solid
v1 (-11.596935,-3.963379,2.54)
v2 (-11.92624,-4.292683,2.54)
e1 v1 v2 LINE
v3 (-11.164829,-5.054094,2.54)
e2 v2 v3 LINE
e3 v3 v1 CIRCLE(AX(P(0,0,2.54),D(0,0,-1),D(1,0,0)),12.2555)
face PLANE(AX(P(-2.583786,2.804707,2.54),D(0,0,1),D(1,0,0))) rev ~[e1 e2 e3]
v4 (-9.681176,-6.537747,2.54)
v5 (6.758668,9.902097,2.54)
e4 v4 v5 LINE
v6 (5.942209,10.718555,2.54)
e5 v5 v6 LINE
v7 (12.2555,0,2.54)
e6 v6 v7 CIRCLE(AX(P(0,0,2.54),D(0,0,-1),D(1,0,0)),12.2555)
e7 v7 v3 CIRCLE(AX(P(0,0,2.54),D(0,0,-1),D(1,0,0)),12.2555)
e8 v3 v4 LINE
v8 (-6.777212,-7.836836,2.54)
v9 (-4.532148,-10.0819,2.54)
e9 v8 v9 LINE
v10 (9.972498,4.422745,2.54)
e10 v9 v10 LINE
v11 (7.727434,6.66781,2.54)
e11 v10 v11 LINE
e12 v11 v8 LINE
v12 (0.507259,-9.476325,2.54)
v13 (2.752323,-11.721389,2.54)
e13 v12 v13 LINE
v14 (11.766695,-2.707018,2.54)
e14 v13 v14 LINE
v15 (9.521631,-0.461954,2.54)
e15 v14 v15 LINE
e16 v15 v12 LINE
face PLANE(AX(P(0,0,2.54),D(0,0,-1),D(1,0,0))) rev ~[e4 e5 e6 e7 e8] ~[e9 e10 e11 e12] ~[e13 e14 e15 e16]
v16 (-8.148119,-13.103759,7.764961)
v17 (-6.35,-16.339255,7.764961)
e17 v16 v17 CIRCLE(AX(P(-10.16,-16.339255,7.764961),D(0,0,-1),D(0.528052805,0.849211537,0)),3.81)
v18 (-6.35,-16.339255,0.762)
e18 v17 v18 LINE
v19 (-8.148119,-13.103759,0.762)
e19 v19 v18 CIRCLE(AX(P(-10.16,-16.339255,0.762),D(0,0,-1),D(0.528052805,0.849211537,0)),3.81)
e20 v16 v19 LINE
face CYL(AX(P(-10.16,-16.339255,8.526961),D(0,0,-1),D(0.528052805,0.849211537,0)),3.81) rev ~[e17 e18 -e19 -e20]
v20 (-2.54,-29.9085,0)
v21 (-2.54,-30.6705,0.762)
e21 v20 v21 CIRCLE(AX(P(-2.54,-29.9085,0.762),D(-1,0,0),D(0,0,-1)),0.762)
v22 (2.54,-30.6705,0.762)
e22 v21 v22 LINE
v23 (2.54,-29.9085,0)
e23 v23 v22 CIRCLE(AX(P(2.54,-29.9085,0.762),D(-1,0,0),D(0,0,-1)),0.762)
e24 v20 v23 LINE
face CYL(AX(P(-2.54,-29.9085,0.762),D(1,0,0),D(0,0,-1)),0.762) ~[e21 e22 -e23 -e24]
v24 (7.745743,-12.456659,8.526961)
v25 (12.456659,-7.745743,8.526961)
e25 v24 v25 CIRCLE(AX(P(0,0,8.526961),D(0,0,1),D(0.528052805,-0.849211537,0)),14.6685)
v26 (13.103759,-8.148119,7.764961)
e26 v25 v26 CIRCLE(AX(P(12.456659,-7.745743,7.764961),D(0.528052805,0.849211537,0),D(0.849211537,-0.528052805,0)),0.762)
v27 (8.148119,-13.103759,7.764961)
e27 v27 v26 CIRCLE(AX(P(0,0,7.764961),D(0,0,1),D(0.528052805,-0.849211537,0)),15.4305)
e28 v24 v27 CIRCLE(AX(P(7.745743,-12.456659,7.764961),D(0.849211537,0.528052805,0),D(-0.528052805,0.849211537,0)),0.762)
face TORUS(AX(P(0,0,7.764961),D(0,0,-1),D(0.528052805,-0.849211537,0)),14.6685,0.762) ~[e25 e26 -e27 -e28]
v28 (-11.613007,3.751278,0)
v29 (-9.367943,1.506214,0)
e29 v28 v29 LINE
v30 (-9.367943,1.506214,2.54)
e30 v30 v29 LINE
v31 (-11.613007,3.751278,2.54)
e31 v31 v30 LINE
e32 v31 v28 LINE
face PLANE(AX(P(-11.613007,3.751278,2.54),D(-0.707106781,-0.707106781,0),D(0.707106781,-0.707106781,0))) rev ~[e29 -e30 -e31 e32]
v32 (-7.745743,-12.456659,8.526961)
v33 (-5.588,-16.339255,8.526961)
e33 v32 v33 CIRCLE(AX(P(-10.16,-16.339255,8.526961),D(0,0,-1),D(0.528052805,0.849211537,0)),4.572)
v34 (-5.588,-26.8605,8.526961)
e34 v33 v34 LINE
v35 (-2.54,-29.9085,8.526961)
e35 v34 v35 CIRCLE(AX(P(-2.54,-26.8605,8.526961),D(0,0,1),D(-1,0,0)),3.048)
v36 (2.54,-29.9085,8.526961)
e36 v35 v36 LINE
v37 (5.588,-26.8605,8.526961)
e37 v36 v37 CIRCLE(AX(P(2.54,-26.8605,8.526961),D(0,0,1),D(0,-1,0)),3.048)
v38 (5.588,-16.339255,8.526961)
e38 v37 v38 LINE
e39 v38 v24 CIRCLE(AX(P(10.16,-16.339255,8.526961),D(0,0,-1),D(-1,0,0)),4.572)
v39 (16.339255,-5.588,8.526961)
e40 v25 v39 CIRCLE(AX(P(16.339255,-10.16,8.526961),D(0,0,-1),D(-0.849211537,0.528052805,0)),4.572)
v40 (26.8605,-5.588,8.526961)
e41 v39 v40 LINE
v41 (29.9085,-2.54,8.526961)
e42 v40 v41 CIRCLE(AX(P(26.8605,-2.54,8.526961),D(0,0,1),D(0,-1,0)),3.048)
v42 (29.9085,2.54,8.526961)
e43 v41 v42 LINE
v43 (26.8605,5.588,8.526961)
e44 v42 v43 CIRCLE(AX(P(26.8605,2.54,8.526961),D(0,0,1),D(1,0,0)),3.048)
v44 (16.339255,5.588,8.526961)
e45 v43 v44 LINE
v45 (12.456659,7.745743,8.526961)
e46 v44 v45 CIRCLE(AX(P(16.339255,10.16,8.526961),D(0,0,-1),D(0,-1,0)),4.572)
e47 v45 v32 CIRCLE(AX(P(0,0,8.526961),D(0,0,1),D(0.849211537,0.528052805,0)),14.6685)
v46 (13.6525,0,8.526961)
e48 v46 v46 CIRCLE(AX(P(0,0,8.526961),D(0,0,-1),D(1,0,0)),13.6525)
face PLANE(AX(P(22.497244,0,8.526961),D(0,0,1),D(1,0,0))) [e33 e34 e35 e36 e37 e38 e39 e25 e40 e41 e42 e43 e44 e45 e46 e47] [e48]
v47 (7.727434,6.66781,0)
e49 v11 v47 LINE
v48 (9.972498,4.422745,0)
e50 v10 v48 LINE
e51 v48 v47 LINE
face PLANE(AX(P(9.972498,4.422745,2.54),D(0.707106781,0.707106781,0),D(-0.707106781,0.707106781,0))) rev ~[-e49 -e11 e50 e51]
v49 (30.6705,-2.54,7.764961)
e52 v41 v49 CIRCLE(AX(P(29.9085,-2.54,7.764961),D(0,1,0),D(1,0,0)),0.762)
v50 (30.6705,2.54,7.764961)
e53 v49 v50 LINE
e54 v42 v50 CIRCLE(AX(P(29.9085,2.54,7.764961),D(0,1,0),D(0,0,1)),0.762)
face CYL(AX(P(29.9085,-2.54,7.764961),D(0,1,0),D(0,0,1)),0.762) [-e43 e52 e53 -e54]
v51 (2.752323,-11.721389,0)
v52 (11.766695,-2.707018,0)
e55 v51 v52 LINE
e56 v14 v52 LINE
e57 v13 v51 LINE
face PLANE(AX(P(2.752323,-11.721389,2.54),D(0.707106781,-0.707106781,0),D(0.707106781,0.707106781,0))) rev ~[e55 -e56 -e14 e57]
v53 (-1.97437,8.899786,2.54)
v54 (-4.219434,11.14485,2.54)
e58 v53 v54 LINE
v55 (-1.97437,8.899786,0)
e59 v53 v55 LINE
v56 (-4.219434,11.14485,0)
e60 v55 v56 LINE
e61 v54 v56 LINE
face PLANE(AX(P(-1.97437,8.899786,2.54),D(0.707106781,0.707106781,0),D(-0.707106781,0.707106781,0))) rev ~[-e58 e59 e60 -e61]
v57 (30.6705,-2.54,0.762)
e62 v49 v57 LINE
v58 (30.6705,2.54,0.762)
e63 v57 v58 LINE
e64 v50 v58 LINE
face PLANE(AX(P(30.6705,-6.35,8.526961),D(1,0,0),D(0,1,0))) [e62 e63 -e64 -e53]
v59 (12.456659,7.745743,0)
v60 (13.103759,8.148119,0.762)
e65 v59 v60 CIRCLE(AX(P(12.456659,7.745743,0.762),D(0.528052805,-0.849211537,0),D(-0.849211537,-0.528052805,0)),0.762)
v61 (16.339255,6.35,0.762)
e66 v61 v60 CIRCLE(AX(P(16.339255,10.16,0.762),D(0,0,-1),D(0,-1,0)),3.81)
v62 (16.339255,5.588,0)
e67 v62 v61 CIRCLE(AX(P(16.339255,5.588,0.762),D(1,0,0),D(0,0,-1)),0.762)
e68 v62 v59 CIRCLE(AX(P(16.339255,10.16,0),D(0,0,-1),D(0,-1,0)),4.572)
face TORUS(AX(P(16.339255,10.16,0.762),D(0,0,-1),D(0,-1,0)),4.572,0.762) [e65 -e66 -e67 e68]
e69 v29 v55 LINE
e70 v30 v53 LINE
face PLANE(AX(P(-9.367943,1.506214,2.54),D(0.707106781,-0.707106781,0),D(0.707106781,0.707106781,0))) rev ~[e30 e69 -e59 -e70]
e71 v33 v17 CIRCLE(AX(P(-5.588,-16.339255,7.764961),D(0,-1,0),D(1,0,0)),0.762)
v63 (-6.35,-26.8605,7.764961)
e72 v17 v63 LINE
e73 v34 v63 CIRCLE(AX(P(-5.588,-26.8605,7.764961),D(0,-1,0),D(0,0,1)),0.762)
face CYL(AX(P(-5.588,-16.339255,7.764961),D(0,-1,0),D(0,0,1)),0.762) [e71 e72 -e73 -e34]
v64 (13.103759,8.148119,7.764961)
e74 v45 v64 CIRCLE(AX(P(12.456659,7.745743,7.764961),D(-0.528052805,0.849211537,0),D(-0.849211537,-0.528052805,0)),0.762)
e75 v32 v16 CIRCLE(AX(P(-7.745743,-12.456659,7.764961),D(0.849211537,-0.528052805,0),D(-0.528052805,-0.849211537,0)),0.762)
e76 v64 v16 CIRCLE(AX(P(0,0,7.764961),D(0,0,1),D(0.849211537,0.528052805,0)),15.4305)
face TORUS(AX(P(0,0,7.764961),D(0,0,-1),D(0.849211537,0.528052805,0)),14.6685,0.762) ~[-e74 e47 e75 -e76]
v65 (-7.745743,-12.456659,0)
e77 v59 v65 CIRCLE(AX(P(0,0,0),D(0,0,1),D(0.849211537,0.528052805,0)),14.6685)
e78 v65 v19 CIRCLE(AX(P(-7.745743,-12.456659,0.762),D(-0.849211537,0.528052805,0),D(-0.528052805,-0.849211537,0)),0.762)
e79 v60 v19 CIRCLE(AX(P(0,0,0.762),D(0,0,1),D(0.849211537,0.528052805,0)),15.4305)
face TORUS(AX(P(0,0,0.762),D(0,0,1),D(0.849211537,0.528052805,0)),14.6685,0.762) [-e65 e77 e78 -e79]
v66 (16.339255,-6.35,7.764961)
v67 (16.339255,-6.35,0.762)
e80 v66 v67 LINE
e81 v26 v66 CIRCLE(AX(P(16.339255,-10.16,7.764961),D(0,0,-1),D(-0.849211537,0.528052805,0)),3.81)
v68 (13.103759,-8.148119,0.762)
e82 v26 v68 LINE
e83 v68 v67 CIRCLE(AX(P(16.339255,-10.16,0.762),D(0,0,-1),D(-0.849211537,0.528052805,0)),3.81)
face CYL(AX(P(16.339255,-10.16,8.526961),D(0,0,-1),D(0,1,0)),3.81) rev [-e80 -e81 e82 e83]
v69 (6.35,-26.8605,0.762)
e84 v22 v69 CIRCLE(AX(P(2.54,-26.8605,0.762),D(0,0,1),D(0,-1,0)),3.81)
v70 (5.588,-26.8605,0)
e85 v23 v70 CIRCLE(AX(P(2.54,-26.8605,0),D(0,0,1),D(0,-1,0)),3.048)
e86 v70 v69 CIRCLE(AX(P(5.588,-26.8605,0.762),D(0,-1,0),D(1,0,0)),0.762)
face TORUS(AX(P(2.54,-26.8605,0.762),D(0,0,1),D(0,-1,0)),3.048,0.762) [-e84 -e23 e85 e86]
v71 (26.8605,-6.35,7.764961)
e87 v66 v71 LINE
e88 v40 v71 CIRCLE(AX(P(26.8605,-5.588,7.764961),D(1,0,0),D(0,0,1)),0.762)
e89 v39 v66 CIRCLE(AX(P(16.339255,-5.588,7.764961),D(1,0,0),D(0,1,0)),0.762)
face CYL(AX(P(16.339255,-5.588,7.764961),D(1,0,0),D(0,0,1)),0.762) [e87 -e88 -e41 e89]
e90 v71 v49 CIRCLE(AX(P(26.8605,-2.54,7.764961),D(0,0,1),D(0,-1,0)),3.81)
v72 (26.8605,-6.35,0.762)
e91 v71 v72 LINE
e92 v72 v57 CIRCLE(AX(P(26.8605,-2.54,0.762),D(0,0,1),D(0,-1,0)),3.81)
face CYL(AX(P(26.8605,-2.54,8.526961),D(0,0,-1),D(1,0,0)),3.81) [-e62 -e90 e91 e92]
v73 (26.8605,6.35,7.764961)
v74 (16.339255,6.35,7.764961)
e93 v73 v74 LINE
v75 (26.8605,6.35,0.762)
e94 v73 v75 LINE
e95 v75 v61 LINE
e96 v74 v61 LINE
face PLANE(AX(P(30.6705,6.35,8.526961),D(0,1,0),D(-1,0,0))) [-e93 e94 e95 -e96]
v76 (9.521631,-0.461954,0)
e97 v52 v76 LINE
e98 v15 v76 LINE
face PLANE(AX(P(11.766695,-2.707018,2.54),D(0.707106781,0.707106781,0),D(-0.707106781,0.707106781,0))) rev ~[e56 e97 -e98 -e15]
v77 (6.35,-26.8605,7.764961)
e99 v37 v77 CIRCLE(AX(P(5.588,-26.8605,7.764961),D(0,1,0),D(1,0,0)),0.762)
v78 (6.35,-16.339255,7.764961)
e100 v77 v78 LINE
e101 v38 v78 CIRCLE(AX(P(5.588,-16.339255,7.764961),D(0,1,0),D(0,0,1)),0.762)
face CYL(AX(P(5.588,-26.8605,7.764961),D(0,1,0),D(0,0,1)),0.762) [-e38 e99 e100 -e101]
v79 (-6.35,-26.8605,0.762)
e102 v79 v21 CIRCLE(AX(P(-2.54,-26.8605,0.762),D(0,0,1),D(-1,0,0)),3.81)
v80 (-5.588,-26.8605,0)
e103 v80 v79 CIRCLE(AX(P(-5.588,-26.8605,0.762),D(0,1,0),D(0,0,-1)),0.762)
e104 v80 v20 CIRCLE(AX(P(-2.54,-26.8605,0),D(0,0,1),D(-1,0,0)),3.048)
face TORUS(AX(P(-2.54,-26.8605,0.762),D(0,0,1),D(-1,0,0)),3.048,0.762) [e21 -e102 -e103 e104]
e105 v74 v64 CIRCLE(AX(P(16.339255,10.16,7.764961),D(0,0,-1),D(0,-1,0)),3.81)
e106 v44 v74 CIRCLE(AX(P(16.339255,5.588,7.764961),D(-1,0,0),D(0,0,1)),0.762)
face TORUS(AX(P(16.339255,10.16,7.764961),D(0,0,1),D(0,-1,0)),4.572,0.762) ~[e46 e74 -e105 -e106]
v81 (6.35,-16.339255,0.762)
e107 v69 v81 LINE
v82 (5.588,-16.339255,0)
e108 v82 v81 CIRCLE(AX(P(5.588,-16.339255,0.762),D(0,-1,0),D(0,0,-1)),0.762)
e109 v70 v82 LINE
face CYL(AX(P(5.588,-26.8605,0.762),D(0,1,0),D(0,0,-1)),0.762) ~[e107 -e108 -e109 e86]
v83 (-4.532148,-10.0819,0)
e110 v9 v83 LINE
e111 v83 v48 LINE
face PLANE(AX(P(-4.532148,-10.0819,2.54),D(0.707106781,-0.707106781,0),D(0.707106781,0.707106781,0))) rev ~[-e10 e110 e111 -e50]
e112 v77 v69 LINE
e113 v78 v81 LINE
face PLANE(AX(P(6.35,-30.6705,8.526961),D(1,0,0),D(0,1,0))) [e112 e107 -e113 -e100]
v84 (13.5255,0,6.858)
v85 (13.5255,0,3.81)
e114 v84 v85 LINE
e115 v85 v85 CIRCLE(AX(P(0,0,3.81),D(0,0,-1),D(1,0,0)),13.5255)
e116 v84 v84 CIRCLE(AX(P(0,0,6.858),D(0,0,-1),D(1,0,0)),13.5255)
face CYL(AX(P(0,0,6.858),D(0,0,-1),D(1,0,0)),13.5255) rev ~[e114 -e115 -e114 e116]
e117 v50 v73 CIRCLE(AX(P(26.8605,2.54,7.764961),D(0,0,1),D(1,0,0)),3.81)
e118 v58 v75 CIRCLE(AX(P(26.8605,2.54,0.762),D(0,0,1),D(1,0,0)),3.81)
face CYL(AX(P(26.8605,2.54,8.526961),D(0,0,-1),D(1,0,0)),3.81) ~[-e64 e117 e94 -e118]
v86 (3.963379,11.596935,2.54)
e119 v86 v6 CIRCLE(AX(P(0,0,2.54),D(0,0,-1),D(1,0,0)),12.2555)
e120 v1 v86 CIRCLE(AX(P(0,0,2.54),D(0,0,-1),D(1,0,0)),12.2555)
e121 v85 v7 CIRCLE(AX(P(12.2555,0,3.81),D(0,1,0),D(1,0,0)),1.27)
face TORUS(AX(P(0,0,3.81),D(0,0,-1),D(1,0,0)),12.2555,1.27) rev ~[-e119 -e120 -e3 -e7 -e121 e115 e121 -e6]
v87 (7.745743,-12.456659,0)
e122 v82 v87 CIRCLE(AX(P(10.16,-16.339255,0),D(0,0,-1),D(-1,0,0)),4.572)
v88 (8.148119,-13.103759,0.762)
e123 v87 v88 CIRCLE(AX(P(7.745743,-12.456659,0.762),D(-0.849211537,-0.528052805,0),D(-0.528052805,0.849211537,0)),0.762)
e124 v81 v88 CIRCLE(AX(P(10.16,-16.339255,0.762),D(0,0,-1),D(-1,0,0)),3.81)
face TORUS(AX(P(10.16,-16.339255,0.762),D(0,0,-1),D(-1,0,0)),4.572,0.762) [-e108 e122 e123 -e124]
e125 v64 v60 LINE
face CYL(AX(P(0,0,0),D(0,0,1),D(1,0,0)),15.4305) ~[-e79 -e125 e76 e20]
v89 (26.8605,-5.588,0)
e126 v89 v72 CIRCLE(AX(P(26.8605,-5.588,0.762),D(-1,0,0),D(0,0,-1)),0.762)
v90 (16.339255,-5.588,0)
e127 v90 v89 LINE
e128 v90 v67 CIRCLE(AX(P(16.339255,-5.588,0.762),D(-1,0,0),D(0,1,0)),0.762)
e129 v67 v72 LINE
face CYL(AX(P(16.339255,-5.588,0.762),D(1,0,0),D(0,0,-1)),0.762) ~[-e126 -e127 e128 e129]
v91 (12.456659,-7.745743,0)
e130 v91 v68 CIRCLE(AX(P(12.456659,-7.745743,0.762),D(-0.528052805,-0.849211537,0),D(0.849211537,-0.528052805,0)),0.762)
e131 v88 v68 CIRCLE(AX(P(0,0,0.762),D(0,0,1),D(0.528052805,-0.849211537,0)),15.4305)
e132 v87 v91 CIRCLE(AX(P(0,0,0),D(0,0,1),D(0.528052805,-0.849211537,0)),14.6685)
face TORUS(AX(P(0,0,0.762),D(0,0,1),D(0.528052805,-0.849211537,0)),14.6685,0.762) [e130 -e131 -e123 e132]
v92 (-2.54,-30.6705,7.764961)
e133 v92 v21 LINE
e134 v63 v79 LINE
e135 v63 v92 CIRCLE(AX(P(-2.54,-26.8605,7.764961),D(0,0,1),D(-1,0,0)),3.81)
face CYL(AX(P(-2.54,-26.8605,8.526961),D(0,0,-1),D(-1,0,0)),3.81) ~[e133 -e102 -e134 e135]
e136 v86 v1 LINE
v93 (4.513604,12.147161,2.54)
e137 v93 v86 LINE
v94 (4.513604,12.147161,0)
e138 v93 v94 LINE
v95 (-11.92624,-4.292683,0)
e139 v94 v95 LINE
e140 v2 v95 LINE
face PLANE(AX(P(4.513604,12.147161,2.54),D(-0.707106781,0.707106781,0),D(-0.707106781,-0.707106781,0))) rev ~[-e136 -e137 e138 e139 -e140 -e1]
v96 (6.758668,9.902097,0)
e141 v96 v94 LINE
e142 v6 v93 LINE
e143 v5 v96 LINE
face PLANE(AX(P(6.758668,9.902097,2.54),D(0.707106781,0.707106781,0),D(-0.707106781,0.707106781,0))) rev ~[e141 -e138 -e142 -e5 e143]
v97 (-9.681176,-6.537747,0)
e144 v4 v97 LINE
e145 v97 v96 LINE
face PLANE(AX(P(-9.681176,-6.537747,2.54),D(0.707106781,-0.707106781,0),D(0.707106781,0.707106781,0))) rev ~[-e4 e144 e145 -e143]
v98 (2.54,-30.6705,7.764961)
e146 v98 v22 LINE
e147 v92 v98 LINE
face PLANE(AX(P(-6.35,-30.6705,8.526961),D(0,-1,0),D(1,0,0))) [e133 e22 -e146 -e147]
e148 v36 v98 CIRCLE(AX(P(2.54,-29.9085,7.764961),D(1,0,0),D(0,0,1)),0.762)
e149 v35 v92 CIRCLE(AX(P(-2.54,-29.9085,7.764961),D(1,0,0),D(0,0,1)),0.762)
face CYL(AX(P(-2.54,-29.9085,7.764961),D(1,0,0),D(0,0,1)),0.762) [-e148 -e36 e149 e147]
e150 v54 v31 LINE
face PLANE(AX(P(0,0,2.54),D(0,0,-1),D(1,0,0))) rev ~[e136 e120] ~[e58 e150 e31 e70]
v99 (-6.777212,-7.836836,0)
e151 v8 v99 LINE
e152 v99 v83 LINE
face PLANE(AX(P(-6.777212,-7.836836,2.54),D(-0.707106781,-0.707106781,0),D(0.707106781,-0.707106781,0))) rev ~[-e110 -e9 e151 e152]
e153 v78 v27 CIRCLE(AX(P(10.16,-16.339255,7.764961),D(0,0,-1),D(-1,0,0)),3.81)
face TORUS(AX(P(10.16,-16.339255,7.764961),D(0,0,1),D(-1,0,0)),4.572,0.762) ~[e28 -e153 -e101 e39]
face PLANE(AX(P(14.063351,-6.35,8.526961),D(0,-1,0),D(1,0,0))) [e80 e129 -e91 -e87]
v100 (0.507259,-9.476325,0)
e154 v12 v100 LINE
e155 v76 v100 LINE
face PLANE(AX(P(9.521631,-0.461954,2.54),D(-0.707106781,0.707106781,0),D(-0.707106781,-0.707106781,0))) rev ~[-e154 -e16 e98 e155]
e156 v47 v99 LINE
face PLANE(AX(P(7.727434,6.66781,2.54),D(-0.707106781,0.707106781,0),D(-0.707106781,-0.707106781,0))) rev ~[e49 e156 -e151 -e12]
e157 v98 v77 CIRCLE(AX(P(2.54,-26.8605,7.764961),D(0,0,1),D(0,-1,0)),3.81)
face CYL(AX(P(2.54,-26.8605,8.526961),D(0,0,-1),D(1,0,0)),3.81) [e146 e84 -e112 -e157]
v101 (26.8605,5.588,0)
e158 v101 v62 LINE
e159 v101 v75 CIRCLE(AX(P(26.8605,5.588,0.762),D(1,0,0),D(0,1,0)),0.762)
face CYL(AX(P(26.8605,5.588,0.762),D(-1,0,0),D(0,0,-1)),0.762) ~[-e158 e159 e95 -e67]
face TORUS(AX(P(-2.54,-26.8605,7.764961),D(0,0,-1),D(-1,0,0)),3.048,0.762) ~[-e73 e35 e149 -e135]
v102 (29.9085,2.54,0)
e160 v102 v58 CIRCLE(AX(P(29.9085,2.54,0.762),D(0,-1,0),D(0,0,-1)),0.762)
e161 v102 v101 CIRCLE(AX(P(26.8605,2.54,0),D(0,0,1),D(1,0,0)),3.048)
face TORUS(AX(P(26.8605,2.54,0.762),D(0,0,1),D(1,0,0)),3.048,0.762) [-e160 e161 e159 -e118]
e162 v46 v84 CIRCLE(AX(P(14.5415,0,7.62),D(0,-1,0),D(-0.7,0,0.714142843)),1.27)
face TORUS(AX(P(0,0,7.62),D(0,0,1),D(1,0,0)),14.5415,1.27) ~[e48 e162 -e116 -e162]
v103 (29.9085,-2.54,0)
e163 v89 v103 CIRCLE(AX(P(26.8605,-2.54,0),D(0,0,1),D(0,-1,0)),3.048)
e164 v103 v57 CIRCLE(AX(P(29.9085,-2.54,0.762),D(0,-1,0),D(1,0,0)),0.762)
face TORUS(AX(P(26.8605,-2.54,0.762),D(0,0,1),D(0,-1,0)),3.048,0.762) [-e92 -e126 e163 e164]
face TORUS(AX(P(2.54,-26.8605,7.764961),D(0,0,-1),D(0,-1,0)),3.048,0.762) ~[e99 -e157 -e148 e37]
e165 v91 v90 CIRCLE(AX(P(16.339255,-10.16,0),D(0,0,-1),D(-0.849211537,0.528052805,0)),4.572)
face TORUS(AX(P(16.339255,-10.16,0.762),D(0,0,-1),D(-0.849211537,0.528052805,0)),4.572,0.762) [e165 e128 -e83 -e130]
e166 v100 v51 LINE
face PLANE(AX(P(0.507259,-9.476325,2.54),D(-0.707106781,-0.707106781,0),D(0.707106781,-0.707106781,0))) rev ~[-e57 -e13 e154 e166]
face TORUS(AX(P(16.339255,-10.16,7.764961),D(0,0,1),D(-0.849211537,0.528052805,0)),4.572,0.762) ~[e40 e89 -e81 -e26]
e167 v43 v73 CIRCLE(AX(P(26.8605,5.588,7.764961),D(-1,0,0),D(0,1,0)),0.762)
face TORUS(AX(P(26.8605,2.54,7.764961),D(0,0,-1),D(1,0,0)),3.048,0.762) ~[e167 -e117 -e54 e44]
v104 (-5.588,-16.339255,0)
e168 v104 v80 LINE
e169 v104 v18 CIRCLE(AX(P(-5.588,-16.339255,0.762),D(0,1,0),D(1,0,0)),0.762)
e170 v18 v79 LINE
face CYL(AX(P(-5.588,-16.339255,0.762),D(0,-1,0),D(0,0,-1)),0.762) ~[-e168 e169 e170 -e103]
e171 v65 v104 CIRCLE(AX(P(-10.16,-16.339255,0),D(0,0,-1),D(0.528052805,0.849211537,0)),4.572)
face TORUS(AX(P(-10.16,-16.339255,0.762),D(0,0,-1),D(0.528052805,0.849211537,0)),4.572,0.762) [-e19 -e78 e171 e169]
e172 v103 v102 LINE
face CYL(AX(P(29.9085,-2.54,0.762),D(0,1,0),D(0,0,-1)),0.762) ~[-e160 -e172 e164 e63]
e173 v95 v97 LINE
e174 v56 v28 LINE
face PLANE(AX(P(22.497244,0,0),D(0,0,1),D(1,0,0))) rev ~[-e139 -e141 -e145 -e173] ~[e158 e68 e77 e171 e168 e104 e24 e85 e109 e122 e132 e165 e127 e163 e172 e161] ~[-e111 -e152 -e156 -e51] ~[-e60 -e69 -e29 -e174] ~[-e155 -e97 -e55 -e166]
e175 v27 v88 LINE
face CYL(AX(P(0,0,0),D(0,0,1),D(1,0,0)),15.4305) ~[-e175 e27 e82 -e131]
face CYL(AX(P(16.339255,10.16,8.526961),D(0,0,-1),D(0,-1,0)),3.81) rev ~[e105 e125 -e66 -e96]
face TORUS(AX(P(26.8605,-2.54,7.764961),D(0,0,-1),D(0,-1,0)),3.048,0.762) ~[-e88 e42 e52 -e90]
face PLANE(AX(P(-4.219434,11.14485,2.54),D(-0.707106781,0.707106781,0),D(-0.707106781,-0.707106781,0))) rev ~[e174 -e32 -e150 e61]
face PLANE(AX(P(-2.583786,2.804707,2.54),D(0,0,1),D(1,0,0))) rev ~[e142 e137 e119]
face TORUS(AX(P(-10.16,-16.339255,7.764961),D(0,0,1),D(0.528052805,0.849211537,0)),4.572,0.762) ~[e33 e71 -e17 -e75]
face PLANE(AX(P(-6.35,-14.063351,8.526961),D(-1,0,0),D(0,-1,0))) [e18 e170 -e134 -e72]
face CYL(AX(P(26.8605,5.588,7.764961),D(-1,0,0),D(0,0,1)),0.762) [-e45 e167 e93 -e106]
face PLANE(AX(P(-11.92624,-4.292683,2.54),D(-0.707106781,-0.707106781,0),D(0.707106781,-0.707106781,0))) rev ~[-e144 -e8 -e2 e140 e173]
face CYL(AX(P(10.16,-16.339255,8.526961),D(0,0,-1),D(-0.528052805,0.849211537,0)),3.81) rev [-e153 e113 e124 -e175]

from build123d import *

# Parameters (mm, degrees)
F3_DEPTH = 8.5269614104
F4_R     = 3.81
F5_R     = 0.762
F7_DEPTH = 25.4


with BuildPart() as f1:
    # F0 (on Front) → F1 (revolve)
    with BuildSketch(Plane.XZ):
        with BuildLine():
            Line((15.4305, 0), (15.4305, 6.7130385896))
            ThreePointArc((15.4305, 6.7130385896), (14.4451376493, 6.3536610654), (13.5255, 6.858))
            Line((13.5255, 6.858), (13.5255, 3.81))
            ThreePointArc((13.5255, 3.81), (13.1535256121, 2.9119743879), (12.2555, 2.54))
            Line((12.2555, 2.54), (0, 2.54))
            Line((0, 2.54), (0, 0))
            Line((0, 0), (15.4305, 0))
        make_face()
        with BuildLine():
            ThreePointArc((13.5255, 6.858), (14.4451376493, 6.3536610654), (15.4305, 6.7130385896))
            Line((15.4305, 6.7130385896), (15.4305, 8.5269614104))
            Line((15.4305, 8.5269614104), (13.6525, 8.5269614104))
            ThreePointArc((13.6525, 8.5269614104), (13.2751610654, 7.7163623507), (13.5255, 6.858))
        make_face()
    revolve(axis=Axis((0, 0, 4.2298094004), (0, 0, -1)))

    # F2 (on face) → F3 (join, through all)
    with BuildSketch(Plane.XY.offset(8.5269614104)):
        with BuildLine():
            Line((30.6705, -6.35), (30.6705, 6.35))
            Line((30.6705, 6.35), (14.0633506054, 6.35))
            ThreePointArc((14.0633506054, 6.35), (15.4305, 0), (14.0633506054, -6.35))
            Line((14.0633506054, -6.35), (30.6705, -6.35))
        make_face()
        with BuildLine():
            Line((-6.35, -30.6705), (6.35, -30.6705))
            Line((6.35, -30.6705), (6.35, -14.0633506054))
            ThreePointArc((6.35, -14.0633506054), (0, -15.4305), (-6.35, -14.0633506054))
            Line((-6.35, -14.0633506054), (-6.35, -30.6705))
        make_face()
    extrude(amount=-F3_DEPTH)

    # F4
    f4_edges = [f1.edges().sort_by_distance(p)[0] for p in [
        (-6.35, -30.6705, 4.263481),
        (-6.35, -14.063351, 4.263481),
        (6.35, -30.6705, 4.263481),
        (6.35, -14.063351, 4.263481),
        (14.063351, -6.35, 4.263481),
        (30.6705, -6.35, 4.263481),
        (30.6705, 6.35, 4.263481),
        (14.063351, 6.35, 4.263481),
    ]]
    fillet(f4_edges, radius=F4_R)

    # F5
    f5_edges = [f1.edges().sort_by_distance(p)[0] for p in [
        (0, -30.6705, 8.526961),
        (0, -30.6705, 0),
    ]]
    fillet(f5_edges, radius=F5_R)

    # F6 (on face) → F7 (cut)
    with BuildSketch(Plane.XY.offset(2.54)):
        Polygon((2.7523231475, -11.7213891216), (11.76669461, -2.7070176591), (9.5216305797, -0.4619536288), (0.5072591172, -9.4763250914), align=None)
        Polygon((-4.5321477931, -10.0819004043), (9.9724980907, 4.4227454795), (7.7274340604, 6.6678095097), (-6.7772118234, -7.836836374), align=None)
        Polygon((-9.6811759284, -6.5377472694), (6.7586679854, 9.9020966443), (4.5136039551, 12.1471606746), (-11.9262399586, -4.2926832391), align=None)
        Polygon((-9.3679427371, 1.5062135006), (-1.974369983, 8.8997862547), (-4.2194340133, 11.144850285), (-11.6130067674, 3.7512775309), align=None)
    extrude(amount=-F7_DEPTH, mode=Mode.SUBTRACT)


solid = f1.part
